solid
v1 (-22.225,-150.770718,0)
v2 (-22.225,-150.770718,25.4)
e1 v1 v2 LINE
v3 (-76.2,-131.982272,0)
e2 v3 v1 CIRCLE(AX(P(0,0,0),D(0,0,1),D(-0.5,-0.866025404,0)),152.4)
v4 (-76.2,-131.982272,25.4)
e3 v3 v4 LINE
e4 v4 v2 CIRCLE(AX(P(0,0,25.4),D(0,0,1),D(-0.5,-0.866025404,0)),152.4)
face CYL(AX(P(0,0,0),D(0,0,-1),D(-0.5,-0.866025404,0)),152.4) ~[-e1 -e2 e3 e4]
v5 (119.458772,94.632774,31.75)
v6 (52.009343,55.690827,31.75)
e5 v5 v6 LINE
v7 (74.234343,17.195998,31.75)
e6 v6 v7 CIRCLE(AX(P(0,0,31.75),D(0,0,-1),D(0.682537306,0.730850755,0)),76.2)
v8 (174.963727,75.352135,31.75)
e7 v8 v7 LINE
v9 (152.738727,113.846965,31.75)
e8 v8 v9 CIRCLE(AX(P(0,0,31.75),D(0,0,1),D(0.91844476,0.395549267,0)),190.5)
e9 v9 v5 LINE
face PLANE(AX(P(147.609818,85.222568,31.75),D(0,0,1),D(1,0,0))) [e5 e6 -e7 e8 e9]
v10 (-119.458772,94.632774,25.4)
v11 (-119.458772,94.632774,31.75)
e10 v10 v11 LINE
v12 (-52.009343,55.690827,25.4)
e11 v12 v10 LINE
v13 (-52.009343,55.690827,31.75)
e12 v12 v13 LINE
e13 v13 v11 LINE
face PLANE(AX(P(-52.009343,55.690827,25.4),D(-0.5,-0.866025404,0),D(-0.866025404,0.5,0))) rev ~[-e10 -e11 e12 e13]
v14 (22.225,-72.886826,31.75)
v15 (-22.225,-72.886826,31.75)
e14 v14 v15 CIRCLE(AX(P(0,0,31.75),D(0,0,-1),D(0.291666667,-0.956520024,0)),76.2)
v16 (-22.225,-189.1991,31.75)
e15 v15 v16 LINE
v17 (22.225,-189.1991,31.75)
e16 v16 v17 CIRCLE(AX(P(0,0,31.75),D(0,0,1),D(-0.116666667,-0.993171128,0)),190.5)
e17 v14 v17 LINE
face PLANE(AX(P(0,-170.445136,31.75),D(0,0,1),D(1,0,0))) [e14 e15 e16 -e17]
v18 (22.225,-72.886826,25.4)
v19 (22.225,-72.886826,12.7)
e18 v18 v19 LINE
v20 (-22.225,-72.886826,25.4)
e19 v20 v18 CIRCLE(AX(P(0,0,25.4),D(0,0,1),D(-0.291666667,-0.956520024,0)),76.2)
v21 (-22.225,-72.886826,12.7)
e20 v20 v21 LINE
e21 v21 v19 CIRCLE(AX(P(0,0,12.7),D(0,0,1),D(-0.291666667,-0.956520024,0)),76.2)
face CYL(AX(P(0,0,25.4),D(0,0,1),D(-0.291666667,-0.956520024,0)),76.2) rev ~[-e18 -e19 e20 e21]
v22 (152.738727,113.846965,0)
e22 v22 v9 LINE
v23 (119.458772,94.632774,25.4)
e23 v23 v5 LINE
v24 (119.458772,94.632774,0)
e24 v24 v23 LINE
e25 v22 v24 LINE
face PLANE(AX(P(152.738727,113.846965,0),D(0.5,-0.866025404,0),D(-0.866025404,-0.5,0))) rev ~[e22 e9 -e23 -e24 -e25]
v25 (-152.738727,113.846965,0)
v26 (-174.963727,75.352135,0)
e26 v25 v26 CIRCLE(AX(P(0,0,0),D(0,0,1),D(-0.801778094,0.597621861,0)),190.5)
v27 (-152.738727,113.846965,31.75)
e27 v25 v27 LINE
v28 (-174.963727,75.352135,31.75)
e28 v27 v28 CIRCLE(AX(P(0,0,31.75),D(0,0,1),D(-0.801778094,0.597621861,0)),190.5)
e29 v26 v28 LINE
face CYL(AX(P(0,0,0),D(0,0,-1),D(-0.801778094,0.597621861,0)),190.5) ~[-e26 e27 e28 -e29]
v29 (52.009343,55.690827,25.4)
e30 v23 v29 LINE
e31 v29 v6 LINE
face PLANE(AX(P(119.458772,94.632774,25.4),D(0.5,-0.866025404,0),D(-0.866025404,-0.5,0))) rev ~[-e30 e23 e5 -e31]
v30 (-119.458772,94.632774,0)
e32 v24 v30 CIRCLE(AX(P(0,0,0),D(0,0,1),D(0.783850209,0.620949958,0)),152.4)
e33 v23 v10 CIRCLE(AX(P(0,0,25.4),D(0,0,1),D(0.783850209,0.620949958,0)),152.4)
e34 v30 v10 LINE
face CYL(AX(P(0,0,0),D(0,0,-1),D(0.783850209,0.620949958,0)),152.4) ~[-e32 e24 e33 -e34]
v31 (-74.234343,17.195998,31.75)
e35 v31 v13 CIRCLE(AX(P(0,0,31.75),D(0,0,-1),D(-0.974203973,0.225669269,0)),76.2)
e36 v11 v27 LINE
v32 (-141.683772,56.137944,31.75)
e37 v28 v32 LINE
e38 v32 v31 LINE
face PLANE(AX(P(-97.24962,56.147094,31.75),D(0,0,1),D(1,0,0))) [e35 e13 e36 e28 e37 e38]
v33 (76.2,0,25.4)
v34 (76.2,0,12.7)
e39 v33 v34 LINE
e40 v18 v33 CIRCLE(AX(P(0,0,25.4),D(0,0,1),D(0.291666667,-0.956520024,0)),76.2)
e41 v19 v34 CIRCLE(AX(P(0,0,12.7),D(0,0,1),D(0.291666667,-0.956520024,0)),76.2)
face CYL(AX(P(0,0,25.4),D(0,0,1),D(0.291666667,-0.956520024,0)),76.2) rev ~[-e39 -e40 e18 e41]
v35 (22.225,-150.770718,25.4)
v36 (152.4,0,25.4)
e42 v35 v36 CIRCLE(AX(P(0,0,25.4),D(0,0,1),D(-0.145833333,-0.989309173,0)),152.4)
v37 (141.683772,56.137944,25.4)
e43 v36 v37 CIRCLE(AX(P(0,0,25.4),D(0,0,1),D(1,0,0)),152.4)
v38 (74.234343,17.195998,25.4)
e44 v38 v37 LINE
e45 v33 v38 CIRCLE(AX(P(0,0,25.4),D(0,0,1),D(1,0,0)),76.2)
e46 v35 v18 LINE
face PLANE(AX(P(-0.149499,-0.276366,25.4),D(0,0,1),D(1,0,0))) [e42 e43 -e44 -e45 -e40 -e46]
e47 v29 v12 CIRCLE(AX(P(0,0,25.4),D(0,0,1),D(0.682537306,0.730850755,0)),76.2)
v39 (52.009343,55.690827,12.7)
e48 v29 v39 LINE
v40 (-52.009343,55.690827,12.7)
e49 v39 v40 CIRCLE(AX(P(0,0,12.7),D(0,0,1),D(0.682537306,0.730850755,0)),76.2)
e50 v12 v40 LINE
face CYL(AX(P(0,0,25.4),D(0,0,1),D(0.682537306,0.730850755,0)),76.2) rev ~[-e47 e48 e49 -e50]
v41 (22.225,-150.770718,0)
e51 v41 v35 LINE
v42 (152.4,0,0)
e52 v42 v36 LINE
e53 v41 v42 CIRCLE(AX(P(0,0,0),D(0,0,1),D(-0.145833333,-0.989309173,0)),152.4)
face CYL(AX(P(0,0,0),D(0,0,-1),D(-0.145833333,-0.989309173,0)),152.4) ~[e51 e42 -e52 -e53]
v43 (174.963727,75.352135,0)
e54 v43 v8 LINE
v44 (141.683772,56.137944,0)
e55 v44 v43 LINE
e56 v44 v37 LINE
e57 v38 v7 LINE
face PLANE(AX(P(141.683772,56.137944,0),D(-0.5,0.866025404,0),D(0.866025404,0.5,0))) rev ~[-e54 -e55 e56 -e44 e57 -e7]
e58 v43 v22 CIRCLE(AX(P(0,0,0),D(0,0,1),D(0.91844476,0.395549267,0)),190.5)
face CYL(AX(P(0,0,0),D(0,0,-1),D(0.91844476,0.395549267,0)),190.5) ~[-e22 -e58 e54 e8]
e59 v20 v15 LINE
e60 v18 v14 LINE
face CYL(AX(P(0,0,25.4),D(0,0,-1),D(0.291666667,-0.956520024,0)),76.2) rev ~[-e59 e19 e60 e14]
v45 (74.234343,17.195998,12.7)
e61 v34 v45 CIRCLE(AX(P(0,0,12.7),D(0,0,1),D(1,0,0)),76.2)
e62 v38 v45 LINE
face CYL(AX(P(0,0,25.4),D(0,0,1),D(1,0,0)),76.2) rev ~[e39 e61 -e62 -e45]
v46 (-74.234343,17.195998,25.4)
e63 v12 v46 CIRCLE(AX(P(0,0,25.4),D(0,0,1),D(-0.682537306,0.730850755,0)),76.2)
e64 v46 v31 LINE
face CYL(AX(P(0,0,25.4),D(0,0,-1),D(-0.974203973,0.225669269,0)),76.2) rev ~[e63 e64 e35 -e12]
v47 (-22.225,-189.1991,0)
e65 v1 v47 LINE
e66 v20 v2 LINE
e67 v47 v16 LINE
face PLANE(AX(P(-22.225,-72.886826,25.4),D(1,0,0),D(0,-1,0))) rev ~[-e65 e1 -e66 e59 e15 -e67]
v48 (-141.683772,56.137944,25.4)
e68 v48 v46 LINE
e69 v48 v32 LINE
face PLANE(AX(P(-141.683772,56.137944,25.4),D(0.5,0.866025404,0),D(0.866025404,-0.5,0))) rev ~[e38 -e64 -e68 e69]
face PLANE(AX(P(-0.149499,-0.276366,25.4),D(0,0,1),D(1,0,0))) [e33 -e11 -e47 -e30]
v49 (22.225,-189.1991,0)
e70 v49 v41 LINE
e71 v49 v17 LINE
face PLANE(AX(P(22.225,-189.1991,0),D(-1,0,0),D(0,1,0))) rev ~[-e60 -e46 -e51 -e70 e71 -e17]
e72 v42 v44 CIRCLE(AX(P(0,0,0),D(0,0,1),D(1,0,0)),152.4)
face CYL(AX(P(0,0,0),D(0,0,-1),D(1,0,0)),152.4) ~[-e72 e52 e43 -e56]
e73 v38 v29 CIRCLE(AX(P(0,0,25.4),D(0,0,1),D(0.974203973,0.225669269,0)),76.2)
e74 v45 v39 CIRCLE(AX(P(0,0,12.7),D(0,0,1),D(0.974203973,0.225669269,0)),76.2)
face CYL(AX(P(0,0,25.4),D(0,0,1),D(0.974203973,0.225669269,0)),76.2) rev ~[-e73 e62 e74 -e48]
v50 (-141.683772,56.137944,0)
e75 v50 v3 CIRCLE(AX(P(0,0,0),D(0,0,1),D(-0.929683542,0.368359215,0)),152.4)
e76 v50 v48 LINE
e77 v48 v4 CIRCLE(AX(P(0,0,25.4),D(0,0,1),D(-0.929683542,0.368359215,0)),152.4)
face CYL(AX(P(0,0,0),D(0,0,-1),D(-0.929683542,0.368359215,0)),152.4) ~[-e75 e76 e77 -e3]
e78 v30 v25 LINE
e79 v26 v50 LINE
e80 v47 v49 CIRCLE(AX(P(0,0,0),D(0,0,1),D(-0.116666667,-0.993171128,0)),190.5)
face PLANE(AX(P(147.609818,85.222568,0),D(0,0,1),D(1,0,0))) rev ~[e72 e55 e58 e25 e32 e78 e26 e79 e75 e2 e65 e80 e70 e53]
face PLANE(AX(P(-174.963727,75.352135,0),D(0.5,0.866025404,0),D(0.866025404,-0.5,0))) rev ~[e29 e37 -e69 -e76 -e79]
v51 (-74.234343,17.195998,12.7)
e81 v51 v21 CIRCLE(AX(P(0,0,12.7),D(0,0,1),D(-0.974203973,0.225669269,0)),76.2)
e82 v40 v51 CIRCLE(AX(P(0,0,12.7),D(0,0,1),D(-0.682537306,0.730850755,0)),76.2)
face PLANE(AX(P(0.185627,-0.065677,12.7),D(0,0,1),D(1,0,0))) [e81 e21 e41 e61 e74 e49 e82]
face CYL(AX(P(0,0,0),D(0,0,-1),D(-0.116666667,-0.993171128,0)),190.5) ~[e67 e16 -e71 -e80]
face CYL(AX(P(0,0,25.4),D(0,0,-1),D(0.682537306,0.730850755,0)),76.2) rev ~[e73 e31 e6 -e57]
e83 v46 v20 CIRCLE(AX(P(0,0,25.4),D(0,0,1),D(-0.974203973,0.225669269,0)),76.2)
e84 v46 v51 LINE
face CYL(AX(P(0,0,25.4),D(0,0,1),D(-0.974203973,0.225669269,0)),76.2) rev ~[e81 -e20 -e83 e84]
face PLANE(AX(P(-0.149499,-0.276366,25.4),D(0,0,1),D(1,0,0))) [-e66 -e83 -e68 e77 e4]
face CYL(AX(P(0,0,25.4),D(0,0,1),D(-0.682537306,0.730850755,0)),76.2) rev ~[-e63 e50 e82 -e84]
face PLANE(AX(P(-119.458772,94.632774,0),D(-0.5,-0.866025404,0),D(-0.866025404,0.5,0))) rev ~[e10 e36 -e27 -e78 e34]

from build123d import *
from build123d import SkipClean  # not in build123d's __all__

# Parameters (mm, degrees)
F1_DEPTH = 25.4
F3_DEPTH = 12.7
F4_DEPTH = 6.35
F5_DEPTH = 31.75


# Not quite as in the source:
# - after a boolean that leaves OpenCascade's solid faulty, fix() repairs it


with BuildPart() as f1:
    # F0 (on Top) → F1 (new body)
    with BuildSketch(Plane.XY):
        with BuildLine():
            ThreePointArc((22.225, -150.7707178964), (115.3534784911, -99.5958583476), (152.4, 0))
            ThreePointArc((152.4, 0), (149.696971962, 28.5758041952), (141.6837718451, 56.1379443491))
            ThreePointArc((141.6837718451, 56.1379443491), (131.9822715367, 76.2), (119.4587718451, 94.6327735473))
            ThreePointArc((119.4587718451, 94.6327735473), (28.5758041952, 149.696971962), (-76.2, 131.9822715367))
            ThreePointArc((-76.2, 131.9822715367), (-99.5958583476, 115.3534784911), (-119.4587718451, 94.6327735473))
            ThreePointArc((-119.4587718451, 94.6327735473), (-131.9822715367, 76.2), (-141.6837718451, 56.1379443491))
            ThreePointArc((-141.6837718451, 56.1379443491), (-143.9292826863, -50.1011136144), (-76.2, -131.9822715367))
            ThreePointArc((-76.2, -131.9822715367), (-50.1011136144, -143.9292826863), (-22.225, -150.7707178964))
            ThreePointArc((-22.225, -150.7707178964), (0, -152.4), (22.225, -150.7707178964))
        make_face()
    extrude(amount=F1_DEPTH)

    # F2 (on face) → F3 (cut)
    with BuildSketch(Plane.XY.offset(25.4)):
        with BuildLine():
            ThreePointArc((22.225, -72.8868257986), (61.2371823323, -45.3480705212), (76.2, 0))
            ThreePointArc((76.2, 0), (75.7069908166, 8.6539899179), (74.2343427428, 17.1959983002))
            ThreePointArc((74.2343427428, 17.1959983002), (65.9911357684, 38.1), (52.0093427428, 55.6908274984))
            ThreePointArc((52.0093427428, 55.6908274984), (0, 76.2), (-52.0093427428, 55.6908274984))
            ThreePointArc((-52.0093427428, 55.6908274984), (-65.9911357684, 38.1), (-74.2343427428, 17.1959983002))
            ThreePointArc((-74.2343427428, 17.1959983002), (-65.9911357684, -38.1), (-22.225, -72.8868257986))
            ThreePointArc((-22.225, -72.8868257986), (0, -76.2), (22.225, -72.8868257986))
        make_face()
    extrude(amount=-F3_DEPTH, mode=Mode.SUBTRACT)

    # F2 (on face) → F4 (join)
    with BuildSketch(Plane.XY.offset(25.4)):
        with BuildLine():
            ThreePointArc((-74.2343427428, 17.1959983002), (-65.9911357684, 38.1), (-52.0093427428, 55.6908274984))
            Line((-52.0093427428, 55.6908274984), (-119.4587718451, 94.6327735473))
            ThreePointArc((-119.4587718451, 94.6327735473), (-131.9822715367, 76.2), (-141.6837718451, 56.1379443491))
            Line((-141.6837718451, 56.1379443491), (-74.2343427428, 17.1959983002))
        make_face()
        with BuildLine():
            Line((22.225, -150.7707178964), (22.225, -72.8868257986))
            ThreePointArc((22.225, -72.8868257986), (0, -76.2), (-22.225, -72.8868257986))
            Line((-22.225, -72.8868257986), (-22.225, -150.7707178964))
            ThreePointArc((-22.225, -150.7707178964), (0, -152.4), (22.225, -150.7707178964))
        make_face()
        with BuildLine():
            ThreePointArc((52.0093427428, 55.6908274984), (65.9911357684, 38.1), (74.2343427428, 17.1959983002))
            Line((74.2343427428, 17.1959983002), (141.6837718451, 56.1379443491))
            ThreePointArc((141.6837718451, 56.1379443491), (131.9822715367, 76.2), (119.4587718451, 94.6327735473))
            Line((119.4587718451, 94.6327735473), (52.0093427428, 55.6908274984))
        make_face()
    with SkipClean():  # cleaning this boolean's faces spoils the solid; the shape is the same uncleaned
        extrude(amount=F4_DEPTH)

    # F0 (on Top) → F5 (join)
    with BuildSketch(Plane.XY):
        with BuildLine():
            ThreePointArc((119.4587718451, 94.6327735473), (131.9822715367, 76.2), (141.6837718451, 56.1379443491))
            Line((141.6837718451, 56.1379443491), (174.9637268225, 75.3521353139))
            ThreePointArc((174.9637268225, 75.3521353139), (164.9778394209, 95.25), (152.7387268225, 113.8469645122))
            Line((152.7387268225, 113.8469645122), (119.4587718451, 94.6327735473))
        make_face()
        with BuildLine():
            ThreePointArc((-141.6837718451, 56.1379443491), (-131.9822715367, 76.2), (-119.4587718451, 94.6327735473))
            Line((-119.4587718451, 94.6327735473), (-152.7387268225, 113.8469645122))
            ThreePointArc((-152.7387268225, 113.8469645122), (-164.9778394209, 95.25), (-174.9637268225, 75.3521353139))
            Line((-174.9637268225, 75.3521353139), (-141.6837718451, 56.1379443491))
        make_face()
        with BuildLine():
            Line((22.225, -189.1990998261), (22.225, -150.7707178964))
            ThreePointArc((22.225, -150.7707178964), (0, -152.4), (-22.225, -150.7707178964))
            Line((-22.225, -150.7707178964), (-22.225, -189.1990998261))
            ThreePointArc((-22.225, -189.1990998261), (0, -190.5), (22.225, -189.1990998261))
        make_face()
    extrude(amount=F5_DEPTH)

    add(f1.part.fix(), mode=Mode.REPLACE)


solid = f1.part
